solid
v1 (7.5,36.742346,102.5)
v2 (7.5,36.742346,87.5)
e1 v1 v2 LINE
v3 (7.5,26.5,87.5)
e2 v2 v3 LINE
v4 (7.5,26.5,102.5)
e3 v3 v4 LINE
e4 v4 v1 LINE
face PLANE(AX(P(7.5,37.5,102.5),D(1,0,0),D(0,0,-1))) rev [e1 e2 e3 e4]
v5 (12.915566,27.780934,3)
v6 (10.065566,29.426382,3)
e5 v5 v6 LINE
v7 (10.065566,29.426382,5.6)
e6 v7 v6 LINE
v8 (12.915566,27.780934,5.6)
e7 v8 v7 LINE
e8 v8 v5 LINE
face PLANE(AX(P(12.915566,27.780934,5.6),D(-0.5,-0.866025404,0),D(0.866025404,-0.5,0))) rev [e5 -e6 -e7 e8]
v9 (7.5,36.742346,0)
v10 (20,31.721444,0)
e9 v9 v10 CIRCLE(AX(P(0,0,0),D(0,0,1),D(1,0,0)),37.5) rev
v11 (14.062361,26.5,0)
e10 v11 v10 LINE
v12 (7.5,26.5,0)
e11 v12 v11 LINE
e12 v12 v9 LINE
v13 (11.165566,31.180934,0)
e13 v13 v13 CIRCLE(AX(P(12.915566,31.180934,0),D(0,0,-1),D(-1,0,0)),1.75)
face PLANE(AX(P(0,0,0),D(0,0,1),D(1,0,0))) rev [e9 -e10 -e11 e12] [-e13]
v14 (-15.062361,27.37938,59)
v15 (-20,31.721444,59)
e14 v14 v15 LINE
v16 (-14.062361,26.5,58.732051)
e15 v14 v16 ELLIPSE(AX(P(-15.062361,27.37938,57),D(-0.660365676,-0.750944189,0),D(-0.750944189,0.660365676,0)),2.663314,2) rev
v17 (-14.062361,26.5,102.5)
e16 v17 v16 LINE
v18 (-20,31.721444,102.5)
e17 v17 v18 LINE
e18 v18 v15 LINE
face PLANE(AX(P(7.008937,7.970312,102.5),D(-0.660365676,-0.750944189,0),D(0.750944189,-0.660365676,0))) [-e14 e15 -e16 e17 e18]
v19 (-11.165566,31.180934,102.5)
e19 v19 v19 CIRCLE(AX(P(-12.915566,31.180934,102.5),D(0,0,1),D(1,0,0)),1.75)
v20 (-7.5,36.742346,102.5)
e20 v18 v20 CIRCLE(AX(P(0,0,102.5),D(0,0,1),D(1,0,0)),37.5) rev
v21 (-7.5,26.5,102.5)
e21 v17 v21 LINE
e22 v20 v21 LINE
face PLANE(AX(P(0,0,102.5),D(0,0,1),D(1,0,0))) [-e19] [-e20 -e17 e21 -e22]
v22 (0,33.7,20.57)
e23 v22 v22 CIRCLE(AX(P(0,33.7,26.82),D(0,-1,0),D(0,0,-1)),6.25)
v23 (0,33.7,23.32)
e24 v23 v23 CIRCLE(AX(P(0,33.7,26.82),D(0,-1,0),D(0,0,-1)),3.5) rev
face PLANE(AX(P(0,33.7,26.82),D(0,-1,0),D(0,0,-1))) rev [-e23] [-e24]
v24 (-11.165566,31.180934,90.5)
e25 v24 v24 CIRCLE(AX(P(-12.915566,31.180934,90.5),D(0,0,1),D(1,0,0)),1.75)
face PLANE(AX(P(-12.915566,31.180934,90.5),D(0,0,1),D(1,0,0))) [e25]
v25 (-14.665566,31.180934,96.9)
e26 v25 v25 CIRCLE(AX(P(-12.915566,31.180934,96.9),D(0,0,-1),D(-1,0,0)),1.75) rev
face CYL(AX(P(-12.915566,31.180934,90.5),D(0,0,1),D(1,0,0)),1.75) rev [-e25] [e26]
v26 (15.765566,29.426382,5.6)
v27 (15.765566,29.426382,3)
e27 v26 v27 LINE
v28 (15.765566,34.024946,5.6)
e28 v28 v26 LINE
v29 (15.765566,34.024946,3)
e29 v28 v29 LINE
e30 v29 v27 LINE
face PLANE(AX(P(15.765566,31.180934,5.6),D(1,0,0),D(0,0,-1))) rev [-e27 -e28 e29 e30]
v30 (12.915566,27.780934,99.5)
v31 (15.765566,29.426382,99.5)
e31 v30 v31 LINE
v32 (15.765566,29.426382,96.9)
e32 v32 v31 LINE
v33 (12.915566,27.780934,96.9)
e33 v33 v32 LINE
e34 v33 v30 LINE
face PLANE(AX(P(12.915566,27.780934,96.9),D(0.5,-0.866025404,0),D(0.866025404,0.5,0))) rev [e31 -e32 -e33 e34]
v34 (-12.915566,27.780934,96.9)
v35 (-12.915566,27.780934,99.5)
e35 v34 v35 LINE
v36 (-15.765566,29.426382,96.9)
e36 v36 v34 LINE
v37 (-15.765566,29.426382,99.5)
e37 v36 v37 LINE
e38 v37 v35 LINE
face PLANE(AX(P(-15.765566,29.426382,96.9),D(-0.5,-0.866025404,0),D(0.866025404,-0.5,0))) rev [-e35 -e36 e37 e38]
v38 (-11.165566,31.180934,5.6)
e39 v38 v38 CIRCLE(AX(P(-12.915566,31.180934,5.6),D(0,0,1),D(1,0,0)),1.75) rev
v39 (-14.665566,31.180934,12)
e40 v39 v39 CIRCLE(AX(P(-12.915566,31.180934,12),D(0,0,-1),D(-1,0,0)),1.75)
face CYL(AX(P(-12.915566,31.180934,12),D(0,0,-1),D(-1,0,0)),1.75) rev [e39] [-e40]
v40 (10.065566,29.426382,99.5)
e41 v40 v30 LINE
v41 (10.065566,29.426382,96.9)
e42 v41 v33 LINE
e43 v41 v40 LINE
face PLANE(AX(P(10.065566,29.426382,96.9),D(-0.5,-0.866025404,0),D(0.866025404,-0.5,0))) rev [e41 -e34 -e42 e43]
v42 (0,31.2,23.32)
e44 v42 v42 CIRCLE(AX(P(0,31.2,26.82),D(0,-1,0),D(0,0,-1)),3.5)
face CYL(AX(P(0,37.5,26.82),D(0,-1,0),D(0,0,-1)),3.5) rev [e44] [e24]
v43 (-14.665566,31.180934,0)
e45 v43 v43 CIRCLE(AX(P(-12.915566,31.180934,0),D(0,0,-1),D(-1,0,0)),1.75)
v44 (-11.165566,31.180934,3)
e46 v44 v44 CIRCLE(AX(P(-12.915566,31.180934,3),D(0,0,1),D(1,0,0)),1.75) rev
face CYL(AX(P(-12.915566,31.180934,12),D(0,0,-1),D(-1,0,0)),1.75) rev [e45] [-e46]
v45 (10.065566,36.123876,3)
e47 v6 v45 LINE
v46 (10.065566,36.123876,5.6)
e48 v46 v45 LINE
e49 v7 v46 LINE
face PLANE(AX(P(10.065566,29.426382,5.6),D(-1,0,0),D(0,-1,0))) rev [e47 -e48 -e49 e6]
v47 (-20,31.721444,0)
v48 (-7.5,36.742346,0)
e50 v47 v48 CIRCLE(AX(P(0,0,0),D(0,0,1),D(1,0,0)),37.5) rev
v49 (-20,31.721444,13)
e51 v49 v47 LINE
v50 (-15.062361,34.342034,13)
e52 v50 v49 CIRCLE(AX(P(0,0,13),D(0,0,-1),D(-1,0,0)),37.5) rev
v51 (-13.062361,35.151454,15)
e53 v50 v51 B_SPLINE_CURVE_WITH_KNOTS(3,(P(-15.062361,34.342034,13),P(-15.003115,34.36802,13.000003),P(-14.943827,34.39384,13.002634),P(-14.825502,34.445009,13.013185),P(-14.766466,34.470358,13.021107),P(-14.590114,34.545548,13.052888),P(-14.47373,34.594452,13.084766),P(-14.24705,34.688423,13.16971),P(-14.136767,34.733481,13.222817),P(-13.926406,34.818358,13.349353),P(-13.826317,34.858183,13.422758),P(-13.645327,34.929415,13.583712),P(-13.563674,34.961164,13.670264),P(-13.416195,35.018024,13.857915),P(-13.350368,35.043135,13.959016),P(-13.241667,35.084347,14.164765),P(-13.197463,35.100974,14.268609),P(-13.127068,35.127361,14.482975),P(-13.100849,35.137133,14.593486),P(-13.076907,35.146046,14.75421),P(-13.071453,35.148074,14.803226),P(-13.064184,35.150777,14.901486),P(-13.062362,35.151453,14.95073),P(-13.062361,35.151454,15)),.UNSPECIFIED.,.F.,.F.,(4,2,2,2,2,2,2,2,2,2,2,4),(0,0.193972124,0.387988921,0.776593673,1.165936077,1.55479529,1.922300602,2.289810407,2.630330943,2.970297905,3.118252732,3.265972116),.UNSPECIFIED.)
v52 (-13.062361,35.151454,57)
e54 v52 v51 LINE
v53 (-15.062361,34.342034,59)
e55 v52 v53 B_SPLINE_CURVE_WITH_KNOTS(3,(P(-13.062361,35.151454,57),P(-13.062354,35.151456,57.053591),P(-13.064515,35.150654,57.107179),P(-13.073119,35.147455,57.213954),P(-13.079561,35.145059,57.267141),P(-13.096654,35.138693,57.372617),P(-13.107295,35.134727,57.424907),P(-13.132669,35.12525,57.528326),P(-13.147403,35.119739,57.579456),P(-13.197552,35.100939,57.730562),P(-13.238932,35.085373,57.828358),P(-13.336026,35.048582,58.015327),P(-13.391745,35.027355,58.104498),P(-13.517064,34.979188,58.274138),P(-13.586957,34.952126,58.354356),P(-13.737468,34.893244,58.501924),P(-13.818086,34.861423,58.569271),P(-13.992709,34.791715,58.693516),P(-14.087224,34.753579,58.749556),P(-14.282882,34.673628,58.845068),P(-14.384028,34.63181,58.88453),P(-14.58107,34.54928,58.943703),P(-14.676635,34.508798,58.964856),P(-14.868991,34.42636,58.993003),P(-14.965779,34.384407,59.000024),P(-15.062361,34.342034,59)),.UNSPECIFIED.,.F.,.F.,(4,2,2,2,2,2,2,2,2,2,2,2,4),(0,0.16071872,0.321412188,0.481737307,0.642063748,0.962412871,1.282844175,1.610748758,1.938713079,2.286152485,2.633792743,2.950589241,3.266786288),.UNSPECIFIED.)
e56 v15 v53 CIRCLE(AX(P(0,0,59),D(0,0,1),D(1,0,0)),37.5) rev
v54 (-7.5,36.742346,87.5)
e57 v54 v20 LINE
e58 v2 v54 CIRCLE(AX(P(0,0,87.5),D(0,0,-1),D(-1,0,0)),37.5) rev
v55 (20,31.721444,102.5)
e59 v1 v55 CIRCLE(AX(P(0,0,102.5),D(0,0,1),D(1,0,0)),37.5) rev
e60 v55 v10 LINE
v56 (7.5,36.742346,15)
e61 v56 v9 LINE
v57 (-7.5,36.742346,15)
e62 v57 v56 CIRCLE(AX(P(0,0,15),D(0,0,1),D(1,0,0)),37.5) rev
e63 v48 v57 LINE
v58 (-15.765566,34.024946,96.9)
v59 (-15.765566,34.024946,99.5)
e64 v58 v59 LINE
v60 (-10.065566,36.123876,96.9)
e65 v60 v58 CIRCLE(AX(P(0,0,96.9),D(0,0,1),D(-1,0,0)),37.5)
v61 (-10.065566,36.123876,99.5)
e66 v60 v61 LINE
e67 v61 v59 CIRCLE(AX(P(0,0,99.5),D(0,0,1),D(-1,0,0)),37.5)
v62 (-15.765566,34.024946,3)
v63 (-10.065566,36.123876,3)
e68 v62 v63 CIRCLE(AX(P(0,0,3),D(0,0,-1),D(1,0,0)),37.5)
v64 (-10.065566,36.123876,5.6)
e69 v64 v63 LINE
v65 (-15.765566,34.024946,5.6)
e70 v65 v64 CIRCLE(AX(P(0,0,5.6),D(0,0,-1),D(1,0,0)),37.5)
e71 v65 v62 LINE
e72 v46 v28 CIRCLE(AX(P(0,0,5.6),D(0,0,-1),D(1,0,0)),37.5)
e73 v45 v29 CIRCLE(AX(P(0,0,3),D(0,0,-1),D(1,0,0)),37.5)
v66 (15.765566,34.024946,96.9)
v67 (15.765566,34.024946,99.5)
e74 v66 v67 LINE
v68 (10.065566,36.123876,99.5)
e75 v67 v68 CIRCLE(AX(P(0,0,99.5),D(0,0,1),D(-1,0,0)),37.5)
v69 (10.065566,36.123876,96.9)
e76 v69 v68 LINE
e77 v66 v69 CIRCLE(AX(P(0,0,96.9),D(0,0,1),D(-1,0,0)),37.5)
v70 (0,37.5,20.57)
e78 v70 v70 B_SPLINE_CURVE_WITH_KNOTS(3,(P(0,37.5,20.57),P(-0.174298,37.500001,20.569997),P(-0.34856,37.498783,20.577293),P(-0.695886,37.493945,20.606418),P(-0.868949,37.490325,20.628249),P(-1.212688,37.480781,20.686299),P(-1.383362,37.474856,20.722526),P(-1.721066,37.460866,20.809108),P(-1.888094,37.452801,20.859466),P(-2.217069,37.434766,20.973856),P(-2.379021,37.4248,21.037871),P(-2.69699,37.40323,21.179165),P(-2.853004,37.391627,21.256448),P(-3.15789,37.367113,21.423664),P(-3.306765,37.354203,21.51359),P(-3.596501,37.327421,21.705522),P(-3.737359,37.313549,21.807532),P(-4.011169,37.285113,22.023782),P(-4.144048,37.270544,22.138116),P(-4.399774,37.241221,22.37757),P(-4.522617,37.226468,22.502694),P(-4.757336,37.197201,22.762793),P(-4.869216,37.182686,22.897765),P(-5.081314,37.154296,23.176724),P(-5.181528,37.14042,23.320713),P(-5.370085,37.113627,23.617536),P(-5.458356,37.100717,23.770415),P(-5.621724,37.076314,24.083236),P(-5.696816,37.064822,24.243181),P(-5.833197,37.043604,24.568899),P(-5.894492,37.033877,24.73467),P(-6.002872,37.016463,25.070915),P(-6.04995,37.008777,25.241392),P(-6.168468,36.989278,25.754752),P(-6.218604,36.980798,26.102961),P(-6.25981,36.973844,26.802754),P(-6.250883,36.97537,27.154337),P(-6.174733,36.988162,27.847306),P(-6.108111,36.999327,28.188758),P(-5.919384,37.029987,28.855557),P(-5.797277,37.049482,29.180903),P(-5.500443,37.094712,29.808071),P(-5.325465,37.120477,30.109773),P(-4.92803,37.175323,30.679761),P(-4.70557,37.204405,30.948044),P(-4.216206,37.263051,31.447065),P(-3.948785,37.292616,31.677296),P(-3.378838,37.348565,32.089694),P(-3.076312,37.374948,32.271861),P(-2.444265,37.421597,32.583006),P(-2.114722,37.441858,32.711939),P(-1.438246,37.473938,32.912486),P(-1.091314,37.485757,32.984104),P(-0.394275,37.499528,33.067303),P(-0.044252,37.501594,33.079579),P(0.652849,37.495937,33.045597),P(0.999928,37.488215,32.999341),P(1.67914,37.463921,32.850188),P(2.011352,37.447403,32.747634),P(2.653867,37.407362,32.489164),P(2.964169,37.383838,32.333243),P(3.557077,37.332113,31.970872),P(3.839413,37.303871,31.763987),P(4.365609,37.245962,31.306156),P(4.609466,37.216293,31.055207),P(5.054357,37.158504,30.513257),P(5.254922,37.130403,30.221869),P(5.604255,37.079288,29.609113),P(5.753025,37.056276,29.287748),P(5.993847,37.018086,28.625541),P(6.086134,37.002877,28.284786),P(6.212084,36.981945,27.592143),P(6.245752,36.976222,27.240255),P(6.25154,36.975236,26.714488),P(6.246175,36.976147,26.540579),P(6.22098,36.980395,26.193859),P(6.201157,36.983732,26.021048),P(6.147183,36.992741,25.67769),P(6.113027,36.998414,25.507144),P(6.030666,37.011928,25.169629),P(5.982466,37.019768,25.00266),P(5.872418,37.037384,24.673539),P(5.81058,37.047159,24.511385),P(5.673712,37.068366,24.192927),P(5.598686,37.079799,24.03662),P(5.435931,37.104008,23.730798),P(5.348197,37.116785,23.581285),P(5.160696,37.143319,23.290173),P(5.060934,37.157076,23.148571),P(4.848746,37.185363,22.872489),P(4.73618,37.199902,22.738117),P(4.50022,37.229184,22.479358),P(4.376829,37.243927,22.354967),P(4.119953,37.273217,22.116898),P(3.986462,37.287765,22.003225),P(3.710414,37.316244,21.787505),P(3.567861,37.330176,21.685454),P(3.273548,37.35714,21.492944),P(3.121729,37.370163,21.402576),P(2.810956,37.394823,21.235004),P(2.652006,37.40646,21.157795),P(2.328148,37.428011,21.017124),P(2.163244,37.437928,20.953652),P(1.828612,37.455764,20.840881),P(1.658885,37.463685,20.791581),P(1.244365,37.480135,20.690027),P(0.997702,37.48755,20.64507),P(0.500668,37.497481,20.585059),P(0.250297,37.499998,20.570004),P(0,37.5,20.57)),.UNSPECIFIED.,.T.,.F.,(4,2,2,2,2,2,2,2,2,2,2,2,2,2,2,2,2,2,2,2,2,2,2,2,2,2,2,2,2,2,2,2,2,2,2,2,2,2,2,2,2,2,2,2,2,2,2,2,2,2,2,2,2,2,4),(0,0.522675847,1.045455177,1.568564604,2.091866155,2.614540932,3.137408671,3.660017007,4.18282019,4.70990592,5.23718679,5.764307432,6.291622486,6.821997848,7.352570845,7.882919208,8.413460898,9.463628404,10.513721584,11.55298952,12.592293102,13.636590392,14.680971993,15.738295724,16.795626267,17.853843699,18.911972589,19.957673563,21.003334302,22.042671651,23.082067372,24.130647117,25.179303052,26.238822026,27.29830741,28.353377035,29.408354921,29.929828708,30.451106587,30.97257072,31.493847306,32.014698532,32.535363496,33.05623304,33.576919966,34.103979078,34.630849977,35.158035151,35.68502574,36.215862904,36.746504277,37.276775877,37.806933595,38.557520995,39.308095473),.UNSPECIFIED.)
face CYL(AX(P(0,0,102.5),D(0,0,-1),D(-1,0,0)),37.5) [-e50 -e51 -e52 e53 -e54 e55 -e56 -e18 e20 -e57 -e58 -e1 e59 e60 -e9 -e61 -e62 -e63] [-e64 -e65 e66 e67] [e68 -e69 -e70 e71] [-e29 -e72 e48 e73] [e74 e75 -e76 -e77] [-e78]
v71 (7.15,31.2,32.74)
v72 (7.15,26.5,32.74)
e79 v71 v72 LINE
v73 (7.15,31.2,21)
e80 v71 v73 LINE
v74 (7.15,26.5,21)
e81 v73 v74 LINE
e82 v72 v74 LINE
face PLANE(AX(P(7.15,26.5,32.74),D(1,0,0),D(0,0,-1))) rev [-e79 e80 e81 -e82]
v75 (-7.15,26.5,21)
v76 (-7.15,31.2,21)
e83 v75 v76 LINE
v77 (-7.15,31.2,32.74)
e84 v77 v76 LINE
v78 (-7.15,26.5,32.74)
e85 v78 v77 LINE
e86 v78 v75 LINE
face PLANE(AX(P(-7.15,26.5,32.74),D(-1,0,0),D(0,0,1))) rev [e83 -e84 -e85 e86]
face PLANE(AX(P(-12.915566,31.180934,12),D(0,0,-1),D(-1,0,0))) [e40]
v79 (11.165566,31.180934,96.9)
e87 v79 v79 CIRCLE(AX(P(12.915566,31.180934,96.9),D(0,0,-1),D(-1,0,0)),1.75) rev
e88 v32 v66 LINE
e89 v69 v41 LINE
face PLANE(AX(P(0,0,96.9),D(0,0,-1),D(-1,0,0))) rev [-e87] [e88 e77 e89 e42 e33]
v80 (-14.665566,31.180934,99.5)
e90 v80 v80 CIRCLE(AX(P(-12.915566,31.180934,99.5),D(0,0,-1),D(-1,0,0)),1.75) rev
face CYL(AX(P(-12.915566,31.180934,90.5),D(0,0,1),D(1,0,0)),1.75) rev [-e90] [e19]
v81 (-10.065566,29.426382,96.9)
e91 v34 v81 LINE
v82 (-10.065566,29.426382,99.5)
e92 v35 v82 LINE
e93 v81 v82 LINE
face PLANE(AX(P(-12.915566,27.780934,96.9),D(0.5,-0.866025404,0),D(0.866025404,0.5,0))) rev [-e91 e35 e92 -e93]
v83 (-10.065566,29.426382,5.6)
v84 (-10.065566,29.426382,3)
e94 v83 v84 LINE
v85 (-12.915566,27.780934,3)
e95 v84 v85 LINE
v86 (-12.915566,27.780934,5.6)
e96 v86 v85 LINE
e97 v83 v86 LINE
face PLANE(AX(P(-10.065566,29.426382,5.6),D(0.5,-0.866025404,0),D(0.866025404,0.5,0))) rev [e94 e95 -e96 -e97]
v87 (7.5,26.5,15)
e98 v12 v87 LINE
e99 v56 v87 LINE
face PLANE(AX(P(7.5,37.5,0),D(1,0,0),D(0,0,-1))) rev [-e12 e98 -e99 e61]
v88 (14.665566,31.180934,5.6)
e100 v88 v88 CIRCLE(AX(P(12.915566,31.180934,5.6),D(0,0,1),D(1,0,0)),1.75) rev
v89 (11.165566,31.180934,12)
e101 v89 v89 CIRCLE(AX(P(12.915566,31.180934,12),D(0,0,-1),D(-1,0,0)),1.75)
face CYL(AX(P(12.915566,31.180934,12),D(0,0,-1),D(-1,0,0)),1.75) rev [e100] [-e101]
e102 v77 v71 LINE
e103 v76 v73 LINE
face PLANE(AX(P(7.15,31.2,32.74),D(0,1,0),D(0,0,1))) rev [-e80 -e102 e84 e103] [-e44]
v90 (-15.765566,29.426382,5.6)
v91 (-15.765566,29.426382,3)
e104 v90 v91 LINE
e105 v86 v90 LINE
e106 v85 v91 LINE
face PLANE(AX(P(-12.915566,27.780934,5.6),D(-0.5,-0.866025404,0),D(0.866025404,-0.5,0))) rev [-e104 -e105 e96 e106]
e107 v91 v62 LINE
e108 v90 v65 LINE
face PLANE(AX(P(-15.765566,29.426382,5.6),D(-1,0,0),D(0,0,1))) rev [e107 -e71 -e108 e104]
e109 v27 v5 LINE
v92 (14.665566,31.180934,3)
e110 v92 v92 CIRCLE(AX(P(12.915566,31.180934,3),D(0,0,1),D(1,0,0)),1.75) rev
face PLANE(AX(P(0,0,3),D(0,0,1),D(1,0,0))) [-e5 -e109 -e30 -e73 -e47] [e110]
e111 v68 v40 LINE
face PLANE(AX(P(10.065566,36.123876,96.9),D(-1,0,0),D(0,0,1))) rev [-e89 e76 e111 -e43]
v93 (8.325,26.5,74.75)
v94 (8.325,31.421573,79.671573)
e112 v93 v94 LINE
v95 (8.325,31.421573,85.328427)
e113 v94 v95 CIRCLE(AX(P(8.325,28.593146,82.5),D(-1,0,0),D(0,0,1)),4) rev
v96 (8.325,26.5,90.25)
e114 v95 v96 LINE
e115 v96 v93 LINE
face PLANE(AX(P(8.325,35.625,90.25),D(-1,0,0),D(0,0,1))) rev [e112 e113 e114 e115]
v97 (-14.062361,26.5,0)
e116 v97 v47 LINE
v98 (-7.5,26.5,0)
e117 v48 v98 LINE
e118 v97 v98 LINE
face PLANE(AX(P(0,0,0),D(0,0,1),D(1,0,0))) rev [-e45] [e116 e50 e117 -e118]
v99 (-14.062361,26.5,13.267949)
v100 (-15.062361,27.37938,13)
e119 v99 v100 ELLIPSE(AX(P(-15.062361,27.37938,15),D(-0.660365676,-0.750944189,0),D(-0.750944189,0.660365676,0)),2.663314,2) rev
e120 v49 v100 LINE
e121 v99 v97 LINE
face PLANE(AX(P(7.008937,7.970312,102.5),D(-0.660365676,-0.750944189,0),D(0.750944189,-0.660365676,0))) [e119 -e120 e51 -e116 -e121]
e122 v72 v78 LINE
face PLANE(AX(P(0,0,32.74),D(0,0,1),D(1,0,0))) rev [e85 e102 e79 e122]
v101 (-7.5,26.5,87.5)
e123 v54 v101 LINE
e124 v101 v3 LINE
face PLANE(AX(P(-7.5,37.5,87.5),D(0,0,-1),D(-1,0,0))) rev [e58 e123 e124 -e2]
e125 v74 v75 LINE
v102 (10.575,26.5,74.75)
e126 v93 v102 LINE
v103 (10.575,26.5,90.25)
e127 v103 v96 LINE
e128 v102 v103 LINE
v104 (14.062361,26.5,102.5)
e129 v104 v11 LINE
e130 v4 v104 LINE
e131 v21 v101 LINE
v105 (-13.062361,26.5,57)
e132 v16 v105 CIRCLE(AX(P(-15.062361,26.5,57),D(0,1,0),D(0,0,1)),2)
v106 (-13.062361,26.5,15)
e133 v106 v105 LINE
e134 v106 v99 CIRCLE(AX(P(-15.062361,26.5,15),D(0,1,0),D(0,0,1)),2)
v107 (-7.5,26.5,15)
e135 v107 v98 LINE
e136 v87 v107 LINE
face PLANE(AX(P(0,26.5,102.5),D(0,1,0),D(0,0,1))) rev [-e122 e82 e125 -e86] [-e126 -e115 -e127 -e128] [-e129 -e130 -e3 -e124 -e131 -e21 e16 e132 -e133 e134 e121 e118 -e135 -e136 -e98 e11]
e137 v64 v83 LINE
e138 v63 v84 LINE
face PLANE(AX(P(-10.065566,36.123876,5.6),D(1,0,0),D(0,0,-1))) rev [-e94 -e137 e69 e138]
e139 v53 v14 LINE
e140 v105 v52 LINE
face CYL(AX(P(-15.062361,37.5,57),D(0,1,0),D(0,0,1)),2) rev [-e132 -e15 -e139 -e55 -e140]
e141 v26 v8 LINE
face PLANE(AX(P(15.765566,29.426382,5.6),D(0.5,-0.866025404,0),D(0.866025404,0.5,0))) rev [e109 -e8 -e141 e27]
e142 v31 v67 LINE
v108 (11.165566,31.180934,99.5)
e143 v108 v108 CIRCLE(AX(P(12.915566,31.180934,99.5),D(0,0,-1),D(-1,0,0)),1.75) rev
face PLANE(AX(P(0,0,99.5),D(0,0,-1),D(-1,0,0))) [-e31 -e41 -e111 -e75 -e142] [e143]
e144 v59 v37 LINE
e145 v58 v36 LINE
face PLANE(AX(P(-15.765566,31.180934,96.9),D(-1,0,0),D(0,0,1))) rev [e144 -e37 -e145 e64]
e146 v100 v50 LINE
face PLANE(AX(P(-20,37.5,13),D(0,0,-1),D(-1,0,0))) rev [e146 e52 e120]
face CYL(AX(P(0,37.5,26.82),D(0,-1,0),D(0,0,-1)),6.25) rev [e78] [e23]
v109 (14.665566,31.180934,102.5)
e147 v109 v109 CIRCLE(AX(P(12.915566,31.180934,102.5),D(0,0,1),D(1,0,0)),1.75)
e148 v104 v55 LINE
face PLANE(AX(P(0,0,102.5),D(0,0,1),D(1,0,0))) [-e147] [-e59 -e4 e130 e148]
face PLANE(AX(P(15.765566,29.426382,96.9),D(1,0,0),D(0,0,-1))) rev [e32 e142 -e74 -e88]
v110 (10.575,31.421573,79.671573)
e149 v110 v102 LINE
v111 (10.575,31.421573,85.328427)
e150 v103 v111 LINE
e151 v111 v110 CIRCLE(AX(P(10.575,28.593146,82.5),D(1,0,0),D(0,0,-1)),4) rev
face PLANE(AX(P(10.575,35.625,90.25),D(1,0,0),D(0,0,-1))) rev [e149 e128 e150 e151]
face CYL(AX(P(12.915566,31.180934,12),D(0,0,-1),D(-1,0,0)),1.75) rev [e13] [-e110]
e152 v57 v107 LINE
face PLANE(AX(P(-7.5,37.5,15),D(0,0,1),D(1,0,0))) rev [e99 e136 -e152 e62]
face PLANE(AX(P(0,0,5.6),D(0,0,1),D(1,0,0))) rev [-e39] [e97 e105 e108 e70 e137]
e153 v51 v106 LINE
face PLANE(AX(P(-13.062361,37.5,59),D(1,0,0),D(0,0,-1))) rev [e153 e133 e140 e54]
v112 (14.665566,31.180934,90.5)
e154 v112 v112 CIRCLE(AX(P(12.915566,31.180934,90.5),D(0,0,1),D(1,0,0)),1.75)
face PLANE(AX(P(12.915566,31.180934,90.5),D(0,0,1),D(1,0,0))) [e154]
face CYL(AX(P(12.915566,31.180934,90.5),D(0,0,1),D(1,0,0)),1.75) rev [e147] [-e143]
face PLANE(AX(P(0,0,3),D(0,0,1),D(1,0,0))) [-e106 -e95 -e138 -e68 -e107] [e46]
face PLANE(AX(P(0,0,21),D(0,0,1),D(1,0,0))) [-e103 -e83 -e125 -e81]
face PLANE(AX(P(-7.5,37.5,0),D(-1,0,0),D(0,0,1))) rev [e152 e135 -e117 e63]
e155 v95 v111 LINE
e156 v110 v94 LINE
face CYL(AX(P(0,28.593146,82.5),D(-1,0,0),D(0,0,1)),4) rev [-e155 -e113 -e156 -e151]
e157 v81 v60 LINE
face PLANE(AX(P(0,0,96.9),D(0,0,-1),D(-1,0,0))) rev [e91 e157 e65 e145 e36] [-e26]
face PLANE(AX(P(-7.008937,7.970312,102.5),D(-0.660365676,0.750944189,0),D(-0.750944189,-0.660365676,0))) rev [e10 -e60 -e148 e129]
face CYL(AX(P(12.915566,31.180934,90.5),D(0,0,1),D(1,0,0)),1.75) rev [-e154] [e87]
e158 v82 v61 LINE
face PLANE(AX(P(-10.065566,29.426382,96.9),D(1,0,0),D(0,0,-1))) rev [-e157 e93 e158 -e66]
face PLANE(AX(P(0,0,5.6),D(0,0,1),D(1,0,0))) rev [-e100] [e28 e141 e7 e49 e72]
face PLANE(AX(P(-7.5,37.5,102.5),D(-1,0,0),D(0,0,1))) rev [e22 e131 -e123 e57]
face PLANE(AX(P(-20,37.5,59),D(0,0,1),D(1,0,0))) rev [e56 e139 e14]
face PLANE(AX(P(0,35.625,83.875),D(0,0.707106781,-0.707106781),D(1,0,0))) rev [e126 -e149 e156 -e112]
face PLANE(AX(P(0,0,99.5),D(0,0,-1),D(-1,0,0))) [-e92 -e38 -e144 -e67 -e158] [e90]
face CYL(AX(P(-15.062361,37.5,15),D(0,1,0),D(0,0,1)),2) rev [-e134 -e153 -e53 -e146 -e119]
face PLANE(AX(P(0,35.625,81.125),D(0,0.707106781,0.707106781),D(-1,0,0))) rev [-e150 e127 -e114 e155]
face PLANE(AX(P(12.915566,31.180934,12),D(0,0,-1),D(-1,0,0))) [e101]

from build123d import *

# Parameters (mm, degrees)
BOSS_EXTRU_2_DEPTH       = 102.5
ESQUISSE7_R              = 1.75
ENL_V_MAT_EXTRU_4_DEPTH  = 12
ENL_V_START              = -5.6
ENL_V_MAT_EXTRU_5_DEPTH  = 2.6
ENL_V_START_2            = -12
ESQUISSE12_R             = 1.75
ENL_V_MAT_EXTRU_6_DEPTH  = 12
ENL_V_START_3            = -3
ENL_V_MAT_EXTRU_7_DEPTH  = 2.6
ENL_V_START_4            = -21
ESQUISSE18_W             = 14.3
ESQUISSE18_H             = 4.7
ENL_V_MAT_EXTRU_11_DEPTH = 11.74
ESQUISSE19_R             = 3.5
ENL_V_MAT_EXTRU_12_DEPTH = 105.622846453
ENL_V_START_5            = -2.5
ESQUISSE20_R             = 6.25
ENL_V_MAT_EXTRU_13_DEPTH = 103.122846576
ESQUISSE21_W             = 15
ESQUISSE21_H             = 15
ENL_V_MAT_EXTRU_14_DEPTH = 106.010713866
ESQUISSE22_W             = 2.25
ESQUISSE22_H             = 15.5
ENL_V_MAT_EXTRU_15_DEPTH = 9.125
CHANFREIN1_SIZE          = 9.125
CONG_1_R                 = 4
ESQUISSE23_W             = 6.93763889
ESQUISSE23_H             = 46
ENL_V_MAT_EXTRU_16_DEPTH = 106.010713866
CONG_2_R                 = 2


with BuildPart() as part:
    # Esquisse3 → Boss.-Extru.2 (new body)
    with BuildSketch(Plane.XY):
        with BuildLine():
            ThreePointArc((-20, 31.721443851), (0, 37.5), (20, 31.721443851))
            Line((20, 31.721443851), (14.06236111, 26.5))
            Line((14.06236111, 26.5), (-14.06236111, 26.5))
            Line((-14.06236111, 26.5), (-20, 31.721443851))
        make_face()
    extrude(amount=BOSS_EXTRU_2_DEPTH)

    # Esquisse7 → Enlèv. mat.-Extru.4 (cut)
    with BuildSketch(Plane.XY.offset(102.5)):
        with Locations((-12.915565842, 31.180934222)):
            Circle(ESQUISSE7_R)
        with Locations((12.915565842, 31.180934222)):
            Circle(ESQUISSE7_R)
    extrude(amount=-ENL_V_MAT_EXTRU_4_DEPTH, mode=Mode.SUBTRACT)

    # Esquisse11 → Enlèv. mat.-Extru.5 (cut)
    with BuildSketch(Plane.XY.offset(102.5).offset(ENL_V_START)):
        with BuildLine():
            Line((-15.765565842, 31.180934222), (-15.765565842, 34.024945756))
            ThreePointArc((-15.765565842, 34.024945756), (-12.95813326, 35.190009696), (-10.065565842, 36.123875543))
            Line((-10.065565842, 36.123875543), (-10.065565842, 29.426382489))
            Line((-10.065565842, 29.426382489), (-12.915565842, 27.780934222))
            Line((-12.915565842, 27.780934222), (-15.765565842, 29.426382489))
            Line((-15.765565842, 29.426382489), (-15.765565842, 31.180934222))
        make_face()
        with BuildLine():
            Line((10.065565842, 36.123875543), (10.065565842, 29.426382489))
            Line((10.065565842, 29.426382489), (12.915565842, 27.780934222))
            Line((12.915565842, 27.780934222), (15.765565842, 29.426382489))
            Line((15.765565842, 29.426382489), (15.765565842, 34.024945756))
            ThreePointArc((15.765565842, 34.024945756), (12.95813326, 35.190009696), (10.065565842, 36.123875543))
        make_face()
    extrude(amount=ENL_V_MAT_EXTRU_5_DEPTH, mode=Mode.SUBTRACT)

    # Esquisse12 → Enlèv. mat.-Extru.6 (cut)
    with BuildSketch(Plane(origin=(0, 0, 0), x_dir=(-1, 0, 0), z_dir=(0, 0, -1)).offset(ENL_V_START_2)):
        with Locations(Location((-12.915565842, 31.180934222, 0), (0, 0, 180))):
            Circle(ESQUISSE12_R)
        with Locations(Location((12.915565842, 31.180934222, 0), (0, 0, 180))):
            Circle(ESQUISSE12_R)
    extrude(amount=ENL_V_MAT_EXTRU_6_DEPTH, mode=Mode.SUBTRACT)

    # Esquisse14 → Enlèv. mat.-Extru.7 (cut)
    with BuildSketch(Plane(origin=(0, 0, 0), x_dir=(-1, 0, 0), z_dir=(0, 0, -1)).offset(ENL_V_START_3)):
        with BuildLine():
            Line((-15.765565842, 31.180934222), (-15.765565842, 34.024945756))
            ThreePointArc((-15.765565842, 34.024945756), (-12.95813326, 35.190009696), (-10.065565842, 36.123875543))
            Line((-10.065565842, 36.123875543), (-10.065565842, 29.426382489))
            Line((-10.065565842, 29.426382489), (-12.915565842, 27.780934222))
            Line((-12.915565842, 27.780934222), (-15.765565842, 29.426382489))
            Line((-15.765565842, 29.426382489), (-15.765565842, 31.180934222))
        make_face()
        with BuildLine():
            Line((10.065565842, 36.123875543), (10.065565842, 29.426382489))
            Line((10.065565842, 29.426382489), (12.915565842, 27.780934222))
            Line((12.915565842, 27.780934222), (15.765565842, 29.426382489))
            Line((15.765565842, 29.426382489), (15.765565842, 34.024945756))
            ThreePointArc((15.765565842, 34.024945756), (12.95813326, 35.190009696), (10.065565842, 36.123875543))
        make_face()
    extrude(amount=-ENL_V_MAT_EXTRU_7_DEPTH, mode=Mode.SUBTRACT)

    # Esquisse18 → Enlèv. mat.-Extru.11 (cut)
    with BuildSketch(Plane(origin=(0, 0, 0), x_dir=(-1, 0, 0), z_dir=(0, 0, -1)).offset(ENL_V_START_4)):
        with Locations((0, 28.85)):
            Rectangle(ESQUISSE18_W, ESQUISSE18_H)
    extrude(amount=-ENL_V_MAT_EXTRU_11_DEPTH, mode=Mode.SUBTRACT)

    # Esquisse19 → Enlèv. mat.-Extru.12 (cut, through all)
    with BuildSketch(Plane(origin=(0, 31.2, 0), x_dir=(-1, 0, 0), z_dir=(0, -1, 0))):
        with Locations(Location((0, -26.82, 0), (0, 0, 90))):
            Circle(ESQUISSE19_R)
    extrude(amount=-ENL_V_MAT_EXTRU_12_DEPTH, mode=Mode.SUBTRACT)

    # Esquisse20 → Enlèv. mat.-Extru.13 (cut, through all)
    with BuildSketch(Plane(origin=(0, 31.2, 0), x_dir=(-1, 0, 0), z_dir=(0, -1, 0)).offset(ENL_V_START_5)):
        with Locations(Location((0, -26.82, 0), (0, 0, 90))):
            Circle(ESQUISSE20_R)
    extrude(amount=-ENL_V_MAT_EXTRU_13_DEPTH, mode=Mode.SUBTRACT)

    # Esquisse21 → Enlèv. mat.-Extru.14 (cut, through all)
    with BuildSketch(Plane.XZ.offset(-26.5)):
        with Locations((0, 95)):
            Rectangle(ESQUISSE21_W, ESQUISSE21_H)
        with Locations((0, 7.5)):
            Rectangle(ESQUISSE21_W, ESQUISSE21_H)
    extrude(amount=-ENL_V_MAT_EXTRU_14_DEPTH, mode=Mode.SUBTRACT)

    # Esquisse22 → Enlèv. mat.-Extru.15 (cut)
    with BuildSketch(Plane(origin=(0, 26.5, 0), x_dir=(-1, 0, 0), z_dir=(0, -1, 0))):
        with Locations((-9.45, -82.5)):
            Rectangle(ESQUISSE22_W, ESQUISSE22_H)
    extrude(amount=-ENL_V_MAT_EXTRU_15_DEPTH, mode=Mode.SUBTRACT)

    # Chanfrein1
    # the kernel refuses this chamfer: 9.125 mm, written as the material it adds along each edge
    with BuildSketch(Plane(origin=(8.325, 35.625, 90.25), x_dir=(0, -0.9996219169112966, 0.027495876610586712), z_dir=(1, 0, 0)), Plane(origin=(10.575, 35.625, 74.75), x_dir=(0, -0.9996219169112966, -0.027495876610586712), z_dir=(-1, 0, 0))) as chanfrein1_piece_1:
        Polygon((CHANFREIN1_SIZE * 0.999621916911, CHANFREIN1_SIZE * 0.0274958766106), (-CHANFREIN1_SIZE * 0.0274958766106, CHANFREIN1_SIZE * 0.999621916911), (0, 0), align=None)
    extrude(amount=2.25)

    # Congé1
    cong_1_edges = [part.edges().sort_by_distance(p)[0] for p in [
        (9.45, 34.25, 82.5),
    ]]
    fillet(cong_1_edges, radius=CONG_1_R)

    # Esquisse23 → Enlèv. mat.-Extru.16 (cut, through all)
    with BuildSketch(Plane(origin=(0, 26.5, 0), x_dir=(-1, 0, 0), z_dir=(0, -1, 0))):
        with Locations((16.531180555, -36)):
            Rectangle(ESQUISSE23_W, ESQUISSE23_H)
    extrude(amount=-ENL_V_MAT_EXTRU_16_DEPTH, mode=Mode.SUBTRACT)

    # Congé2
    cong_2_edges = [part.edges().sort_by_distance(p)[0] for p in [
        (-13.06236111, 30.825727028, 59),
        (-13.06236111, 30.825727028, 13),
    ]]
    fillet(cong_2_edges, radius=CONG_2_R)


solid = part.part
